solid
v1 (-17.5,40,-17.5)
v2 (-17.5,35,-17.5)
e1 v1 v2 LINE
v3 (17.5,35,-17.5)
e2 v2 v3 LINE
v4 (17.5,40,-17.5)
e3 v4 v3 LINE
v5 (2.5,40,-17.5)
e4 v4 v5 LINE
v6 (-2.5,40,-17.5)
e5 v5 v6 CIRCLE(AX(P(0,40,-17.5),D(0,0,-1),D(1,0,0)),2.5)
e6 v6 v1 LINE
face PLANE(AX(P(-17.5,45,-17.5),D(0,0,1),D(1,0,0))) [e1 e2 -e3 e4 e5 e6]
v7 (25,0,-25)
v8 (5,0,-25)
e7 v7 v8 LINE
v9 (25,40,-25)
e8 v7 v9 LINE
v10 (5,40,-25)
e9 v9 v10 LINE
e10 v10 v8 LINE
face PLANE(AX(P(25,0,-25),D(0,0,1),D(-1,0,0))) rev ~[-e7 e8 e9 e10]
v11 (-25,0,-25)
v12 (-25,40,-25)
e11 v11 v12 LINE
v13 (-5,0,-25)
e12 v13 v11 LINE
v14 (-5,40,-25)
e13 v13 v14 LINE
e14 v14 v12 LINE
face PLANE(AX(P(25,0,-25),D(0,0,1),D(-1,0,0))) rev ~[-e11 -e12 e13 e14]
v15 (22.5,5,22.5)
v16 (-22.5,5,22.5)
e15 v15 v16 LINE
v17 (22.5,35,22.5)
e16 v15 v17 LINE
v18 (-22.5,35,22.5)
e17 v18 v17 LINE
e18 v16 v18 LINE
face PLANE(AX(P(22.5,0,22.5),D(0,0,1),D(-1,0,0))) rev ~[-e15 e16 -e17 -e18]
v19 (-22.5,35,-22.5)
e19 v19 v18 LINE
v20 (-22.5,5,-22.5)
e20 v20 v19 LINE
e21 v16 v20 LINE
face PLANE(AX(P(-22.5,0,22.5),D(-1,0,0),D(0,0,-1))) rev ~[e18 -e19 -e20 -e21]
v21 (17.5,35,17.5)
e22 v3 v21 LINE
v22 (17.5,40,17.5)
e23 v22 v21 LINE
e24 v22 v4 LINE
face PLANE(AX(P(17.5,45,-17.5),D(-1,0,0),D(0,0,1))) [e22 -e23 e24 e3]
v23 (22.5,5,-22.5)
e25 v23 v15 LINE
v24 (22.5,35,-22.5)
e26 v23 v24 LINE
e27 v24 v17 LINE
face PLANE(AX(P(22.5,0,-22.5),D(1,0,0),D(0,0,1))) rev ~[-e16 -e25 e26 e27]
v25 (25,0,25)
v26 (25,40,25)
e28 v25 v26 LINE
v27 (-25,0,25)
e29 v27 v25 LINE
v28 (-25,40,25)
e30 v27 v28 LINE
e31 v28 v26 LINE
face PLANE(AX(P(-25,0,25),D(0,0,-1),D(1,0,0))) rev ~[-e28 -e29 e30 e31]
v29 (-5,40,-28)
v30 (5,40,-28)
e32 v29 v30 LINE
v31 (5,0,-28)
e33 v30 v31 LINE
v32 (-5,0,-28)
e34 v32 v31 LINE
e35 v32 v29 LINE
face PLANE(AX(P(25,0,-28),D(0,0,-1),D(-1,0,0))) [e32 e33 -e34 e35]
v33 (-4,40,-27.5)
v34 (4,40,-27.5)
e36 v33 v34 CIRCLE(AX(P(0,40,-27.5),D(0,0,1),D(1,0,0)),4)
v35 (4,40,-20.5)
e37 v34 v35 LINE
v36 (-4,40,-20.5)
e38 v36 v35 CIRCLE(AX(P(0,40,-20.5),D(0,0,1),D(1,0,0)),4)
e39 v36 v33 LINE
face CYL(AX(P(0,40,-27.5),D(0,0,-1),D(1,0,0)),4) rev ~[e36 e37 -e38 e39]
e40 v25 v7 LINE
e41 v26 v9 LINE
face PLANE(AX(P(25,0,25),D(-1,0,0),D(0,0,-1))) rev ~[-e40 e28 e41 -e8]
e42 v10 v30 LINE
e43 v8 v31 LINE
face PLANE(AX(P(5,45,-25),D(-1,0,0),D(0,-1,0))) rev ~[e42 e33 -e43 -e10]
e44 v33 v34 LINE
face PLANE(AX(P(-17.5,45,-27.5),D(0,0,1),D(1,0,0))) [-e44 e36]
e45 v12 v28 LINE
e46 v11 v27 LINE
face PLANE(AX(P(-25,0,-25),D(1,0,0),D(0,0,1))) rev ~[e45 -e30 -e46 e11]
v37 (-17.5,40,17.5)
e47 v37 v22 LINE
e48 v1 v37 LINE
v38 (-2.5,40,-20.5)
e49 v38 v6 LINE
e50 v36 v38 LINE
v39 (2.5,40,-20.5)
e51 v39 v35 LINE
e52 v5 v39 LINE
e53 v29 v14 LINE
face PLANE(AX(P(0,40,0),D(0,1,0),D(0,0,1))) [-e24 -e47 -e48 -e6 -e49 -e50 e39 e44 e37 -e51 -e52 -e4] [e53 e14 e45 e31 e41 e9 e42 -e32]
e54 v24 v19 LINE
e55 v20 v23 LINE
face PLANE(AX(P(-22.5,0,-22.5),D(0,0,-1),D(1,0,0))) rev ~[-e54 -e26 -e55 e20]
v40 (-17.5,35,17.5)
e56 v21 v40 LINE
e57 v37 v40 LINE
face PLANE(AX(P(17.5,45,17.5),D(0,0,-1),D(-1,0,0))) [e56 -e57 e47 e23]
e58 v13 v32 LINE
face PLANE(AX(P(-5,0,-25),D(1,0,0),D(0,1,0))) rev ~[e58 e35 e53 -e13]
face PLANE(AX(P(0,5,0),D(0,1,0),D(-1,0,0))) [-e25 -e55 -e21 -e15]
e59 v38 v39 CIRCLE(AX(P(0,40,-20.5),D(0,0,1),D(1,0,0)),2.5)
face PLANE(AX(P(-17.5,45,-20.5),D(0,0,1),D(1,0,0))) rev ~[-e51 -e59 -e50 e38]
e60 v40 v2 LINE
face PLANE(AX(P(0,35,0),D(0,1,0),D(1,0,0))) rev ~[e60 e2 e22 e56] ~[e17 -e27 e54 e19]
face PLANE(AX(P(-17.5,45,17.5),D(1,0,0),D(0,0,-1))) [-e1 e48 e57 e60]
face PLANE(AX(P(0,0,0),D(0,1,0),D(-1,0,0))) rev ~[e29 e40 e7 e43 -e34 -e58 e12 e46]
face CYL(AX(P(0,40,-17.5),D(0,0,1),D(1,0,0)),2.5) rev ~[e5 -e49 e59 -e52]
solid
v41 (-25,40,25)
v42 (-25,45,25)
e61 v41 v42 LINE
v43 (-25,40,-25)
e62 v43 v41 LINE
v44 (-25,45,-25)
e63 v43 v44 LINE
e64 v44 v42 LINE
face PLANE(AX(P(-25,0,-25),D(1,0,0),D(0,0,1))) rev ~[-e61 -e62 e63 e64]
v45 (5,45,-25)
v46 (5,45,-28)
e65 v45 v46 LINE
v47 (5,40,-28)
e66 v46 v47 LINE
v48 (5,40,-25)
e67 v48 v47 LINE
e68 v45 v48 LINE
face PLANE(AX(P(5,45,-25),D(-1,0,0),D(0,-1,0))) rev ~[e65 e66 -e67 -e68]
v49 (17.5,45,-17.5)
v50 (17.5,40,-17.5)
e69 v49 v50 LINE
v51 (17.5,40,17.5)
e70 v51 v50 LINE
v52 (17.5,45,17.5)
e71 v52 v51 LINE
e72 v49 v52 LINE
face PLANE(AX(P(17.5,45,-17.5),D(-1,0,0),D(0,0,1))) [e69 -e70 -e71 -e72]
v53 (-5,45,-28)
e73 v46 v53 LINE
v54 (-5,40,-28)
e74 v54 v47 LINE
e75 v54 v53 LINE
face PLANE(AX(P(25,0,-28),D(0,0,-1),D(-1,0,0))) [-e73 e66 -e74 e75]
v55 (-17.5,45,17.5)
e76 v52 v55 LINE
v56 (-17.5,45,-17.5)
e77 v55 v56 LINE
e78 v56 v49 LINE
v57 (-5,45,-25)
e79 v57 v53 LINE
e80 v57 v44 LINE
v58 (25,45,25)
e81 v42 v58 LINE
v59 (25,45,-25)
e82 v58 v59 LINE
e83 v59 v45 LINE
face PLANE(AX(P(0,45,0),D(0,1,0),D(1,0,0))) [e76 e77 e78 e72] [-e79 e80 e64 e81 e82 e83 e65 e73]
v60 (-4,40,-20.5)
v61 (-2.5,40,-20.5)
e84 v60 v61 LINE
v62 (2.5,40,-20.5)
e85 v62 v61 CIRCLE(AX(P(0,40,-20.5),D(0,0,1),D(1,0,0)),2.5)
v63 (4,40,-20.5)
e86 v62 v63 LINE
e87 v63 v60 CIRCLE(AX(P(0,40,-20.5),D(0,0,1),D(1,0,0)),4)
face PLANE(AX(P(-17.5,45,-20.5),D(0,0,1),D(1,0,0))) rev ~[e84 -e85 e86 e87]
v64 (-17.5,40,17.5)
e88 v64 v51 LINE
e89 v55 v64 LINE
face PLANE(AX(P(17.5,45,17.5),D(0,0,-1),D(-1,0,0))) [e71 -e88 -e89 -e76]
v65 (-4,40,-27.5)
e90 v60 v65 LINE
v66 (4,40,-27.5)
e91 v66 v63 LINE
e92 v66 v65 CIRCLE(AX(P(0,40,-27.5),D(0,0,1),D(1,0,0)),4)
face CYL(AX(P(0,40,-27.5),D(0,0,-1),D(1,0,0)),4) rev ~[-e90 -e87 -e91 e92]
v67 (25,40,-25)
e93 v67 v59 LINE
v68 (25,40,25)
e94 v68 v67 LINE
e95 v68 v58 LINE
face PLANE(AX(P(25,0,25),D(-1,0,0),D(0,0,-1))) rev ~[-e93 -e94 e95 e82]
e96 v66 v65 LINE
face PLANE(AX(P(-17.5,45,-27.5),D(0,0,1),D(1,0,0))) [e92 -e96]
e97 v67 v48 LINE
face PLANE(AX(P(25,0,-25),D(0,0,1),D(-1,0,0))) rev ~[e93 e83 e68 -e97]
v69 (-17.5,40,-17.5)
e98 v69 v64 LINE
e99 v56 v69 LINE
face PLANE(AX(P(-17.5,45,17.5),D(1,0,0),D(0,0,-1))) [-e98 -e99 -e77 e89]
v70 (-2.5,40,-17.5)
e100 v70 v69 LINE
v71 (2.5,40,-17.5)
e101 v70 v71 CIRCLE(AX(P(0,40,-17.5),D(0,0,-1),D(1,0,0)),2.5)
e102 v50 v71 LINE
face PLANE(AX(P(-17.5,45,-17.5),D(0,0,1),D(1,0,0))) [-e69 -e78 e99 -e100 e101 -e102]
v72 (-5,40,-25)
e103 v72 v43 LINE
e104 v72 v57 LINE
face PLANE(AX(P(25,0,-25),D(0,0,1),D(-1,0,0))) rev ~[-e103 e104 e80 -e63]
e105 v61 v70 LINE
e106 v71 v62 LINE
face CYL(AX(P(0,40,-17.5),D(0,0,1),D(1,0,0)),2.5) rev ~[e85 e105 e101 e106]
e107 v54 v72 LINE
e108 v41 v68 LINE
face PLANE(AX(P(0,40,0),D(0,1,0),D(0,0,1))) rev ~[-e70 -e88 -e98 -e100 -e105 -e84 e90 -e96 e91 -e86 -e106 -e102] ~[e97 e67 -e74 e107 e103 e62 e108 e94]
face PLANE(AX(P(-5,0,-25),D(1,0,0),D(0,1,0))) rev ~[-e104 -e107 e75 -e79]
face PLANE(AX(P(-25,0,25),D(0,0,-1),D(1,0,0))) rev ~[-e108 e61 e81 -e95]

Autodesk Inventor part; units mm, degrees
ref_plane "YZ Plane" through (0, 0, 0) normal (1, 0, 0) x (0, 1, 0)
ref_plane "XZ Plane" through (0, 0, 0) normal (0, 1, 0) x (-1, 0, 0)
ref_plane "XY Plane" through (0, 0, 0) normal (0, 0, 1) x (1, 0, 0)
sketch "Sketch1" plane through (0, 0, 0) normal (0, 1, 0) x (-1, 0, 0)
  line L0 (-25, -25) -> (25, -25)
  line L1 (25, -25) -> (25, 25)
  line L2 (25, 25) -> (-25, 25)
  line L3 (-25, 25) -> (-25, -25)
  line L4 (-25, -25) -> (25, 25) construction
  line L5 (25, -25) -> (-25, 25) construction
  line L6 (-22.5, 22.5) -> (22.5, 22.5)
  line L7 (22.5, 22.5) -> (22.5, -22.5)
  line L8 (22.5, -22.5) -> (-22.5, -22.5)
  line L9 (-22.5, -22.5) -> (-22.5, 22.5)
  line L10 (-22.5, 22.5) -> (22.5, -22.5) construction
  line L11 (22.5, 22.5) -> (-22.5, -22.5) construction
  point P0 (0, 0)
  dimension "d0" = 50
  dimension "d1" = 50
  dimension "d2" = 45
  dimension "d3" = 45
extrude "Extrusion1" add sketch "Sketch1" along normal blind 5 contours L6 L7 L8 L9
extrude "Extrusion2" add sketch "Sketch1" along normal blind 45
sketch "Sketch2" plane through (0, 45, 0) normal (0, 1, 0) x (1, 0, 0)
  line L0 (22.5, 22.5) -> (22.5, -22.5) projected
  line L1 (-22.5, -22.5) -> (22.5, -22.5)
  line L2 (22.5, -22.5) -> (22.5, 22.5)
  line L3 (22.5, 22.5) -> (-22.5, 22.5)
  line L4 (-22.5, 22.5) -> (-22.5, -22.5)
  line L5 (17.5, -17.5) -> (-17.5, -17.5)
  line L6 (-17.5, -17.5) -> (-17.5, 17.5)
  line L7 (-17.5, 17.5) -> (17.5, 17.5)
  line L8 (17.5, 17.5) -> (17.5, -17.5)
  line L9 (17.5, -17.5) -> (-17.5, 17.5) construction
  line L10 (-17.5, -17.5) -> (17.5, 17.5) construction
  point P0 (0, 0)
  dimension "d8" = 35
  dimension "d9" = 35
extrude "Extrusion3" add sketch "Sketch2" against normal blind 10
sketch "Sketch3" plane through (25, 0, -25) normal (0, 0, -1) x (-1, 0, 0)
  line L0 (50, 45) -> (0, 45) projected
  line L1 (25, 45) -> (25, 0)
  line L2 (20, 0) -> (30, 0)
  line L3 (30, 0) -> (30, 45)
  line L4 (30, 45) -> (20, 45)
  line L5 (20, 45) -> (20, 0)
  line L6 (20, 0) -> (30, 45) construction
  line L7 (30, 0) -> (20, 45) construction
  point P0 (25, 22.5)
  dimension "d12" = 10
extrude "Extrusion4" add sketch "Sketch3" along normal blind 3
sketch "Sketch4" plane through (-17.5, 45, -17.5) normal (0, 0, 1) x (1, 0, 0)
  line L0 (0, 0) -> (35, 0) projected
  line L1 (17.5, 0) -> (17.5, -10)
  line L2 (35, -10) -> (0, -10) projected
  circle A0 centre (17.5, -5) radius 2.5
  point P0 (17.5, -45)
  dimension "d15" = 5
extrude "Extrusion5" cut sketch "Sketch4" against normal blind 10
ref_plane "Work Plane1" through (0, 40, 0) normal (0, 1, 0) x (1, 0, 0)
split body "Split1" result two bodies by plane through (0, 40, 0) normal (0, 1, 0) first body at (-22.5, 44.5, -5.8333)
sketch "Sketch6" plane through (-17.5, 45, -27.5) normal (0, 0, 1) x (1, 0, 0)
  line L0 (20, -5) -> (15, -5) projected
  circle A0 centre (17.5, -5) radius 4
  point P0 (17.5, -45)
  dimension "d19" = 8
extrude "Extrusion6" cut sketch "Sketch6" along normal blind 7 bodies 3
sketch "Sketch7" plane through (-17.5, 45, -27.5) normal (0, 0, 1) x (1, 0, 0)
  line L0 (20, -5) -> (15, -5) projected
  circle A0 centre (17.5, -5) radius 4
  point P0 (17.5, -45)
  dimension "d22" = 8
extrude "Extrusion7" cut sketch "Sketch7" along normal blind 7 bodies 2
properties part number "Pudelko"
